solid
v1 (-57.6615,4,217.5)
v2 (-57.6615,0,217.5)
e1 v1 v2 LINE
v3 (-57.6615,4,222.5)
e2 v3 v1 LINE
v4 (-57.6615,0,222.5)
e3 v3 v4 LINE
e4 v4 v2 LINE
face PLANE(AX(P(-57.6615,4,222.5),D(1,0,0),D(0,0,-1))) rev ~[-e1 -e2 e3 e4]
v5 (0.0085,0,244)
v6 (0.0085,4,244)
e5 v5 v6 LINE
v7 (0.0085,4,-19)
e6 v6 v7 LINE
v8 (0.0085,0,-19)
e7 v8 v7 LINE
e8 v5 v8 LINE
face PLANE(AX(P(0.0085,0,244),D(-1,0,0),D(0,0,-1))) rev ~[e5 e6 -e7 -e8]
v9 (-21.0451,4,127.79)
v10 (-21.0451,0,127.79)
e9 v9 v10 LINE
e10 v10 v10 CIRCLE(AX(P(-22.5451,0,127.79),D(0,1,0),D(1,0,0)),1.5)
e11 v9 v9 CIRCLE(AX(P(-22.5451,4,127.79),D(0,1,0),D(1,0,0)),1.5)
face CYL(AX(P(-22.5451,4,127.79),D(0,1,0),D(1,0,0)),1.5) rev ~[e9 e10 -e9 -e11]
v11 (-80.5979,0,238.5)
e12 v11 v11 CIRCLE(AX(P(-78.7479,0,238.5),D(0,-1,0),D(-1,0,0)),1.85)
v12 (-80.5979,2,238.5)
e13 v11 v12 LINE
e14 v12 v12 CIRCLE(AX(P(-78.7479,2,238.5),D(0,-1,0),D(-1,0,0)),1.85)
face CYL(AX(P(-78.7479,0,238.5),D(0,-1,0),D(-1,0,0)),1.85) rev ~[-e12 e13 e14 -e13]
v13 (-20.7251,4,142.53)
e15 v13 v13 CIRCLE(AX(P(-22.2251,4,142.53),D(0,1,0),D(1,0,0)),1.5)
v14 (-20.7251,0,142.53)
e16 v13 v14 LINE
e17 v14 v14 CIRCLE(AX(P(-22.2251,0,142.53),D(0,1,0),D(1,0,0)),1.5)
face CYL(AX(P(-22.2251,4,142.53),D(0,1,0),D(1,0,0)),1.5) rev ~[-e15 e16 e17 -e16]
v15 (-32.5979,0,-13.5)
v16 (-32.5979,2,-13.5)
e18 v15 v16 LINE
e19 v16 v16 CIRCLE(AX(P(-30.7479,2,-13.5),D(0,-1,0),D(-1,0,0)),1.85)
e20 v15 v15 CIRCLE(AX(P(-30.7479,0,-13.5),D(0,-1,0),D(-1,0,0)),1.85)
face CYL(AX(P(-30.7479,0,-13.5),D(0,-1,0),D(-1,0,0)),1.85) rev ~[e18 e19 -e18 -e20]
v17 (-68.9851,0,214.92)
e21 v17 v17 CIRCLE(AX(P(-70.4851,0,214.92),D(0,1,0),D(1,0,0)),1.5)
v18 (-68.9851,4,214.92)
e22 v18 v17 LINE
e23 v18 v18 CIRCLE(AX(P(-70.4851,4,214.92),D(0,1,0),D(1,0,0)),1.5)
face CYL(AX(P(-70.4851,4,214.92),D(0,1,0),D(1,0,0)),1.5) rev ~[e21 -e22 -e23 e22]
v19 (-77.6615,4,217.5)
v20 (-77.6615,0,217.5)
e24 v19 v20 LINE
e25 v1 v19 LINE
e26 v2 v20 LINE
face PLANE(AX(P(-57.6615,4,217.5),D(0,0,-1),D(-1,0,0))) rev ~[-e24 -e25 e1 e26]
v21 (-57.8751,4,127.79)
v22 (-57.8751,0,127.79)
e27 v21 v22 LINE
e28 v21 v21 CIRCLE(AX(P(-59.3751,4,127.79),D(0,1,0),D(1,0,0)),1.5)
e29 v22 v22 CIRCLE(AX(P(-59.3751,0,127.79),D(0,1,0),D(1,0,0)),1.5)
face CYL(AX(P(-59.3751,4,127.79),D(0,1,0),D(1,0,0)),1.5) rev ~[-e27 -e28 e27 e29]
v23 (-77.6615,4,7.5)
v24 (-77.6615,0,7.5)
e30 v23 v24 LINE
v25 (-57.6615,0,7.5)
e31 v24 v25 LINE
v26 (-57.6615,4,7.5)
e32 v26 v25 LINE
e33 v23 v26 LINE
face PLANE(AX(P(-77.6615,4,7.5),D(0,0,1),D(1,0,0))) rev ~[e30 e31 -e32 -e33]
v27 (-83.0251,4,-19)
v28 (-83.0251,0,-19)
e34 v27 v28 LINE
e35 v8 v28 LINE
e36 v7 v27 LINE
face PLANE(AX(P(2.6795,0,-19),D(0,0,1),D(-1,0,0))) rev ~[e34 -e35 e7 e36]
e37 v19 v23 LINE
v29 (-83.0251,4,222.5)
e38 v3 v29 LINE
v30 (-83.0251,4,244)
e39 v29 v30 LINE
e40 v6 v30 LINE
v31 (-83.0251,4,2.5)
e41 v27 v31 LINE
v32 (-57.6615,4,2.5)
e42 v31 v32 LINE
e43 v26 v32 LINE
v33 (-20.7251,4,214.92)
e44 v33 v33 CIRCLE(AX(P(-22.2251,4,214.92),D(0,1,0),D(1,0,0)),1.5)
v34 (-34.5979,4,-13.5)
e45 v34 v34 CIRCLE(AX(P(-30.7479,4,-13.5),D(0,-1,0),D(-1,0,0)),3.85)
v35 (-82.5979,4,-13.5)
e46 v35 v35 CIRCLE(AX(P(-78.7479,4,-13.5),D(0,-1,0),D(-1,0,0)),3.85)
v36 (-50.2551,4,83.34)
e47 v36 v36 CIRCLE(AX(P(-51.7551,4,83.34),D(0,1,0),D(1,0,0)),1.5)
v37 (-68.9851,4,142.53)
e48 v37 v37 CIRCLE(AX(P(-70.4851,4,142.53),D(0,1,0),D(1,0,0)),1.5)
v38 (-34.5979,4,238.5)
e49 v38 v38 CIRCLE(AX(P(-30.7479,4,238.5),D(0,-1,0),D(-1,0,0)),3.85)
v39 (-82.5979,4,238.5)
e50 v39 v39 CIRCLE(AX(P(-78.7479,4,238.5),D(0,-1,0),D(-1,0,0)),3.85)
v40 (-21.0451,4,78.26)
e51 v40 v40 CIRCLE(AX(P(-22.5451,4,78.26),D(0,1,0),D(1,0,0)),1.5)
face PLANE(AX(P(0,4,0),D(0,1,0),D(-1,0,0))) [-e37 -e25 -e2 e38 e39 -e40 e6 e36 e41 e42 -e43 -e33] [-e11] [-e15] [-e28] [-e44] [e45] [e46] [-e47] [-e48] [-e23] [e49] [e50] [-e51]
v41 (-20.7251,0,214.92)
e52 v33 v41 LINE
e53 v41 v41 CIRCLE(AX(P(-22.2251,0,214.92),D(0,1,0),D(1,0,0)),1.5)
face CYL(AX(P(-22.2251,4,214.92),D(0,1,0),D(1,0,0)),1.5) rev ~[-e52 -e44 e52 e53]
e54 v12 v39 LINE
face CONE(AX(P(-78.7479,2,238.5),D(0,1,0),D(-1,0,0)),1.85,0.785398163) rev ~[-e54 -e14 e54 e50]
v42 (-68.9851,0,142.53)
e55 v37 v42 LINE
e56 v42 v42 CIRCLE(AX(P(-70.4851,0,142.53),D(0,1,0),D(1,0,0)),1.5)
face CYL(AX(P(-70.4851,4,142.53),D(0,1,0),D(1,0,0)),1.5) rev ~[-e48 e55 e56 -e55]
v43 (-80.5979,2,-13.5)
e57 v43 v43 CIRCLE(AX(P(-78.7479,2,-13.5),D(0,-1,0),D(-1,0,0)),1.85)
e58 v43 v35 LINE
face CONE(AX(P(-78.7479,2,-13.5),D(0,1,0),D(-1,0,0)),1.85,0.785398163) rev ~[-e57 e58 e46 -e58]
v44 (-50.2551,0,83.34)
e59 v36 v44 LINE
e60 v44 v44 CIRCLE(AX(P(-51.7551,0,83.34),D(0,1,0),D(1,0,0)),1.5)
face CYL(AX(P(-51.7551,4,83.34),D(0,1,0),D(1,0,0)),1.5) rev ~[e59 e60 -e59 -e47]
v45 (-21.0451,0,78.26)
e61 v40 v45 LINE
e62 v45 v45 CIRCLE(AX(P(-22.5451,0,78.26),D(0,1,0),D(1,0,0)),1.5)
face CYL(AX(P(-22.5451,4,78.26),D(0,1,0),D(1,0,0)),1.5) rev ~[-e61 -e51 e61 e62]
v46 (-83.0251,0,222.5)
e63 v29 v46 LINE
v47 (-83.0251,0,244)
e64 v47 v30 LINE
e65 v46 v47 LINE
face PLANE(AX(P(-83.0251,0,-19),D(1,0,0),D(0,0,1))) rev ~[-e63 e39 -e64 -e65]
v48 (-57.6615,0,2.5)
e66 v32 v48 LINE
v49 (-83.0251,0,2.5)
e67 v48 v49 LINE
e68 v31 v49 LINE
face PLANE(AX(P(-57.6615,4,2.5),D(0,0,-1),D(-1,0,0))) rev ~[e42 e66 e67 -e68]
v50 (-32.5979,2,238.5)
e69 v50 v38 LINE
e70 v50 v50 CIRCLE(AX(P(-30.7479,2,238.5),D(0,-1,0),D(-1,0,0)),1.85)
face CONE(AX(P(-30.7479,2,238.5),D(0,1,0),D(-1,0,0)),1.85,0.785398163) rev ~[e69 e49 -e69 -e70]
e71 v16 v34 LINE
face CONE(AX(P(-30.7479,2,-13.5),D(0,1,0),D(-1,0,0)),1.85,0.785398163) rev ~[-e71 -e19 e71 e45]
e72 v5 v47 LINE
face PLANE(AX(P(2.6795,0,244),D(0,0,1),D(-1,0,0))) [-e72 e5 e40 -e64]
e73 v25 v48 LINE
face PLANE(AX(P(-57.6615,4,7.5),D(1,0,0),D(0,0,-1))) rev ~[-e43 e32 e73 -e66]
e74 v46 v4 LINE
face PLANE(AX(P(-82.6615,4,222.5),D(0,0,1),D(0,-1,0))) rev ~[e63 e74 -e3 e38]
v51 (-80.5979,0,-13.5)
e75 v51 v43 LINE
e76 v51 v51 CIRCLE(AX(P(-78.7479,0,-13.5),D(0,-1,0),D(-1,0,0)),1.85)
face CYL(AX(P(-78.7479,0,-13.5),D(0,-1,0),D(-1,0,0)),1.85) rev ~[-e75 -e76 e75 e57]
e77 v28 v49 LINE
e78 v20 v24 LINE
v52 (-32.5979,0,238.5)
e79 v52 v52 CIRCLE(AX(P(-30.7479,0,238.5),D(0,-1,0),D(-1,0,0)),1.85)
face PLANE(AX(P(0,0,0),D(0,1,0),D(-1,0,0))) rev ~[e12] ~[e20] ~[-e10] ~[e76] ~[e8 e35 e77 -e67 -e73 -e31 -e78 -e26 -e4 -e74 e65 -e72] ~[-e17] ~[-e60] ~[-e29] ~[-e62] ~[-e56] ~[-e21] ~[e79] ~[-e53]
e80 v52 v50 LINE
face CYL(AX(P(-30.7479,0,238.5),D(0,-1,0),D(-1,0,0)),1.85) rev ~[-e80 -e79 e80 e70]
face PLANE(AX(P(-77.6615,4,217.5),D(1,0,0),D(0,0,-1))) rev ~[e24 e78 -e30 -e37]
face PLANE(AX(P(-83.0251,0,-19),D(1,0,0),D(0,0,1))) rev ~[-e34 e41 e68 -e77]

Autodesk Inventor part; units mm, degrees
ref_plane "YZ Plane" through (0, 0, 0) normal (1, 0, 0) x (0, 1, 0)
ref_plane "XZ Plane" through (0, 0, 0) normal (0, 1, 0) x (-1, 0, 0)
ref_plane "XY Plane" through (0, 0, 0) normal (0, 0, 1) x (1, 0, 0)
sketch "Эскиз1" plane through (0, 0, 0) normal (0, 1, 0) x (-1, 0, 0)
  line L0 (-2.6795, -19) -> (83.0251, -19)
  line L1 (-2.6795, 244) -> (83.0251, 244)
  circle A0 centre (30.7479, 238.5) radius 1.85
  circle A1 centre (78.7479, 238.5) radius 1.85
  circle A2 centre (78.7479, -13.5) radius 1.85
  circle A3 centre (30.7479, -13.5) radius 1.85
  line L2 (83.0251, 244) -> (-2.6795, 244)
  line L3 (-2.6795, 244) -> (-2.6795, -19)
  line L4 (-2.6795, -19) -> (83.0251, -19)
  line L5 (83.0251, -19) -> (83.0251, 244)
  point P0 (0, 0)
  point P1 (83.0251, -19)
  point P2 (-2.6795, 244)
  dimension "d7" = 5.5
  dimension "d8" = 5.5
  dimension "d9" = 4.2772
  dimension "d10" = 48
  dimension "d11" = 263
  dimension "d12" = 5.5
  dimension "d13" = 5.5
  dimension "d14" = 4.2772
  dimension "d15" = 48
extrude "Выдавливание1" add sketch "Эскиз1" along normal blind 4
thicken "Толщина1" operation add thickness 2.671 both sides no extend neighbours yes toward (-1, 0, 0) faces at (2.6795, 1.3333, 156.3333)
chamfer "Фаска1" distance 2 angle 45 4 edges at (-76.8979, 4, 238.5) (-28.8979, 4, 238.5) (-28.8979, 4, -13.5) (-76.8979, 4, -13.5)
sketch "Эскиз2" plane through (-1.399, 4, 60) normal (0, 1, 0) x (1, 0, 0)
  line L0 (-76.2625, -157.5) -> (-76.2625, 52.5)
  line L1 (-76.2625, 52.5) -> (-56.2625, 52.5)
  line L2 (-56.2625, -157.5) -> (-76.2625, -157.5)
  line L3 (-56.2625, 57.5) -> (-76.2625, 57.5)
  line L4 (-76.2625, 57.5) -> (-81.2625, 57.5)
  line L5 (-81.2625, 57.5) -> (-81.2625, -162.5)
  line L6 (-81.2625, -162.5) -> (-76.2625, -162.5)
  line L7 (-76.2625, -162.5) -> (-56.2625, -162.5)
  line L8 (-56.2625, -162.5) -> (-56.2625, -157.5)
  line L9 (-56.2625, 52.5) -> (-56.2625, 57.5)
  line L10 (1.4075, -184) -> (1.4075, 79) projected
  point P0 (0, 0)
  dimension "d21" = 57.67
  dimension "d22" = 25
  dimension "d23" = 5
extrude "Выдавливание2" cut sketch "Эскиз2" against normal blind 10
thicken "Толщина2" operation add thickness 2 both sides no extend neighbours yes toward (-1, 0, 0) faces at (-82.6615, 2.6667, 75.8333)
sketch "Эскиз3" plane through (0, 4, 0) normal (0, 1, 0) x (1, 0, 0)
  circle A0 centre (-51.7551, -83.34) radius 1.5 projected
  circle A1 centre (-22.5451, -78.26) radius 1.5 projected
  circle A2 centre (-22.5451, -127.79) radius 1.5 projected
  circle A3 centre (-59.3751, -127.79) radius 1.5 projected
  circle A4 centre (-22.2251, -142.53) radius 1.5 projected
  circle A5 centre (-70.4851, -142.53) radius 1.5 projected
  circle A6 centre (-22.2251, -214.92) radius 1.5 projected
  circle A7 centre (-70.4851, -214.92) radius 1.5 projected
  point P0 (0, 0)
extrude "Выдавливание3" cut sketch "Эскиз3" against normal blind 10
properties part number "KB33-046-004-002 - Передняя пластина" material "Дерево (вишня)"
